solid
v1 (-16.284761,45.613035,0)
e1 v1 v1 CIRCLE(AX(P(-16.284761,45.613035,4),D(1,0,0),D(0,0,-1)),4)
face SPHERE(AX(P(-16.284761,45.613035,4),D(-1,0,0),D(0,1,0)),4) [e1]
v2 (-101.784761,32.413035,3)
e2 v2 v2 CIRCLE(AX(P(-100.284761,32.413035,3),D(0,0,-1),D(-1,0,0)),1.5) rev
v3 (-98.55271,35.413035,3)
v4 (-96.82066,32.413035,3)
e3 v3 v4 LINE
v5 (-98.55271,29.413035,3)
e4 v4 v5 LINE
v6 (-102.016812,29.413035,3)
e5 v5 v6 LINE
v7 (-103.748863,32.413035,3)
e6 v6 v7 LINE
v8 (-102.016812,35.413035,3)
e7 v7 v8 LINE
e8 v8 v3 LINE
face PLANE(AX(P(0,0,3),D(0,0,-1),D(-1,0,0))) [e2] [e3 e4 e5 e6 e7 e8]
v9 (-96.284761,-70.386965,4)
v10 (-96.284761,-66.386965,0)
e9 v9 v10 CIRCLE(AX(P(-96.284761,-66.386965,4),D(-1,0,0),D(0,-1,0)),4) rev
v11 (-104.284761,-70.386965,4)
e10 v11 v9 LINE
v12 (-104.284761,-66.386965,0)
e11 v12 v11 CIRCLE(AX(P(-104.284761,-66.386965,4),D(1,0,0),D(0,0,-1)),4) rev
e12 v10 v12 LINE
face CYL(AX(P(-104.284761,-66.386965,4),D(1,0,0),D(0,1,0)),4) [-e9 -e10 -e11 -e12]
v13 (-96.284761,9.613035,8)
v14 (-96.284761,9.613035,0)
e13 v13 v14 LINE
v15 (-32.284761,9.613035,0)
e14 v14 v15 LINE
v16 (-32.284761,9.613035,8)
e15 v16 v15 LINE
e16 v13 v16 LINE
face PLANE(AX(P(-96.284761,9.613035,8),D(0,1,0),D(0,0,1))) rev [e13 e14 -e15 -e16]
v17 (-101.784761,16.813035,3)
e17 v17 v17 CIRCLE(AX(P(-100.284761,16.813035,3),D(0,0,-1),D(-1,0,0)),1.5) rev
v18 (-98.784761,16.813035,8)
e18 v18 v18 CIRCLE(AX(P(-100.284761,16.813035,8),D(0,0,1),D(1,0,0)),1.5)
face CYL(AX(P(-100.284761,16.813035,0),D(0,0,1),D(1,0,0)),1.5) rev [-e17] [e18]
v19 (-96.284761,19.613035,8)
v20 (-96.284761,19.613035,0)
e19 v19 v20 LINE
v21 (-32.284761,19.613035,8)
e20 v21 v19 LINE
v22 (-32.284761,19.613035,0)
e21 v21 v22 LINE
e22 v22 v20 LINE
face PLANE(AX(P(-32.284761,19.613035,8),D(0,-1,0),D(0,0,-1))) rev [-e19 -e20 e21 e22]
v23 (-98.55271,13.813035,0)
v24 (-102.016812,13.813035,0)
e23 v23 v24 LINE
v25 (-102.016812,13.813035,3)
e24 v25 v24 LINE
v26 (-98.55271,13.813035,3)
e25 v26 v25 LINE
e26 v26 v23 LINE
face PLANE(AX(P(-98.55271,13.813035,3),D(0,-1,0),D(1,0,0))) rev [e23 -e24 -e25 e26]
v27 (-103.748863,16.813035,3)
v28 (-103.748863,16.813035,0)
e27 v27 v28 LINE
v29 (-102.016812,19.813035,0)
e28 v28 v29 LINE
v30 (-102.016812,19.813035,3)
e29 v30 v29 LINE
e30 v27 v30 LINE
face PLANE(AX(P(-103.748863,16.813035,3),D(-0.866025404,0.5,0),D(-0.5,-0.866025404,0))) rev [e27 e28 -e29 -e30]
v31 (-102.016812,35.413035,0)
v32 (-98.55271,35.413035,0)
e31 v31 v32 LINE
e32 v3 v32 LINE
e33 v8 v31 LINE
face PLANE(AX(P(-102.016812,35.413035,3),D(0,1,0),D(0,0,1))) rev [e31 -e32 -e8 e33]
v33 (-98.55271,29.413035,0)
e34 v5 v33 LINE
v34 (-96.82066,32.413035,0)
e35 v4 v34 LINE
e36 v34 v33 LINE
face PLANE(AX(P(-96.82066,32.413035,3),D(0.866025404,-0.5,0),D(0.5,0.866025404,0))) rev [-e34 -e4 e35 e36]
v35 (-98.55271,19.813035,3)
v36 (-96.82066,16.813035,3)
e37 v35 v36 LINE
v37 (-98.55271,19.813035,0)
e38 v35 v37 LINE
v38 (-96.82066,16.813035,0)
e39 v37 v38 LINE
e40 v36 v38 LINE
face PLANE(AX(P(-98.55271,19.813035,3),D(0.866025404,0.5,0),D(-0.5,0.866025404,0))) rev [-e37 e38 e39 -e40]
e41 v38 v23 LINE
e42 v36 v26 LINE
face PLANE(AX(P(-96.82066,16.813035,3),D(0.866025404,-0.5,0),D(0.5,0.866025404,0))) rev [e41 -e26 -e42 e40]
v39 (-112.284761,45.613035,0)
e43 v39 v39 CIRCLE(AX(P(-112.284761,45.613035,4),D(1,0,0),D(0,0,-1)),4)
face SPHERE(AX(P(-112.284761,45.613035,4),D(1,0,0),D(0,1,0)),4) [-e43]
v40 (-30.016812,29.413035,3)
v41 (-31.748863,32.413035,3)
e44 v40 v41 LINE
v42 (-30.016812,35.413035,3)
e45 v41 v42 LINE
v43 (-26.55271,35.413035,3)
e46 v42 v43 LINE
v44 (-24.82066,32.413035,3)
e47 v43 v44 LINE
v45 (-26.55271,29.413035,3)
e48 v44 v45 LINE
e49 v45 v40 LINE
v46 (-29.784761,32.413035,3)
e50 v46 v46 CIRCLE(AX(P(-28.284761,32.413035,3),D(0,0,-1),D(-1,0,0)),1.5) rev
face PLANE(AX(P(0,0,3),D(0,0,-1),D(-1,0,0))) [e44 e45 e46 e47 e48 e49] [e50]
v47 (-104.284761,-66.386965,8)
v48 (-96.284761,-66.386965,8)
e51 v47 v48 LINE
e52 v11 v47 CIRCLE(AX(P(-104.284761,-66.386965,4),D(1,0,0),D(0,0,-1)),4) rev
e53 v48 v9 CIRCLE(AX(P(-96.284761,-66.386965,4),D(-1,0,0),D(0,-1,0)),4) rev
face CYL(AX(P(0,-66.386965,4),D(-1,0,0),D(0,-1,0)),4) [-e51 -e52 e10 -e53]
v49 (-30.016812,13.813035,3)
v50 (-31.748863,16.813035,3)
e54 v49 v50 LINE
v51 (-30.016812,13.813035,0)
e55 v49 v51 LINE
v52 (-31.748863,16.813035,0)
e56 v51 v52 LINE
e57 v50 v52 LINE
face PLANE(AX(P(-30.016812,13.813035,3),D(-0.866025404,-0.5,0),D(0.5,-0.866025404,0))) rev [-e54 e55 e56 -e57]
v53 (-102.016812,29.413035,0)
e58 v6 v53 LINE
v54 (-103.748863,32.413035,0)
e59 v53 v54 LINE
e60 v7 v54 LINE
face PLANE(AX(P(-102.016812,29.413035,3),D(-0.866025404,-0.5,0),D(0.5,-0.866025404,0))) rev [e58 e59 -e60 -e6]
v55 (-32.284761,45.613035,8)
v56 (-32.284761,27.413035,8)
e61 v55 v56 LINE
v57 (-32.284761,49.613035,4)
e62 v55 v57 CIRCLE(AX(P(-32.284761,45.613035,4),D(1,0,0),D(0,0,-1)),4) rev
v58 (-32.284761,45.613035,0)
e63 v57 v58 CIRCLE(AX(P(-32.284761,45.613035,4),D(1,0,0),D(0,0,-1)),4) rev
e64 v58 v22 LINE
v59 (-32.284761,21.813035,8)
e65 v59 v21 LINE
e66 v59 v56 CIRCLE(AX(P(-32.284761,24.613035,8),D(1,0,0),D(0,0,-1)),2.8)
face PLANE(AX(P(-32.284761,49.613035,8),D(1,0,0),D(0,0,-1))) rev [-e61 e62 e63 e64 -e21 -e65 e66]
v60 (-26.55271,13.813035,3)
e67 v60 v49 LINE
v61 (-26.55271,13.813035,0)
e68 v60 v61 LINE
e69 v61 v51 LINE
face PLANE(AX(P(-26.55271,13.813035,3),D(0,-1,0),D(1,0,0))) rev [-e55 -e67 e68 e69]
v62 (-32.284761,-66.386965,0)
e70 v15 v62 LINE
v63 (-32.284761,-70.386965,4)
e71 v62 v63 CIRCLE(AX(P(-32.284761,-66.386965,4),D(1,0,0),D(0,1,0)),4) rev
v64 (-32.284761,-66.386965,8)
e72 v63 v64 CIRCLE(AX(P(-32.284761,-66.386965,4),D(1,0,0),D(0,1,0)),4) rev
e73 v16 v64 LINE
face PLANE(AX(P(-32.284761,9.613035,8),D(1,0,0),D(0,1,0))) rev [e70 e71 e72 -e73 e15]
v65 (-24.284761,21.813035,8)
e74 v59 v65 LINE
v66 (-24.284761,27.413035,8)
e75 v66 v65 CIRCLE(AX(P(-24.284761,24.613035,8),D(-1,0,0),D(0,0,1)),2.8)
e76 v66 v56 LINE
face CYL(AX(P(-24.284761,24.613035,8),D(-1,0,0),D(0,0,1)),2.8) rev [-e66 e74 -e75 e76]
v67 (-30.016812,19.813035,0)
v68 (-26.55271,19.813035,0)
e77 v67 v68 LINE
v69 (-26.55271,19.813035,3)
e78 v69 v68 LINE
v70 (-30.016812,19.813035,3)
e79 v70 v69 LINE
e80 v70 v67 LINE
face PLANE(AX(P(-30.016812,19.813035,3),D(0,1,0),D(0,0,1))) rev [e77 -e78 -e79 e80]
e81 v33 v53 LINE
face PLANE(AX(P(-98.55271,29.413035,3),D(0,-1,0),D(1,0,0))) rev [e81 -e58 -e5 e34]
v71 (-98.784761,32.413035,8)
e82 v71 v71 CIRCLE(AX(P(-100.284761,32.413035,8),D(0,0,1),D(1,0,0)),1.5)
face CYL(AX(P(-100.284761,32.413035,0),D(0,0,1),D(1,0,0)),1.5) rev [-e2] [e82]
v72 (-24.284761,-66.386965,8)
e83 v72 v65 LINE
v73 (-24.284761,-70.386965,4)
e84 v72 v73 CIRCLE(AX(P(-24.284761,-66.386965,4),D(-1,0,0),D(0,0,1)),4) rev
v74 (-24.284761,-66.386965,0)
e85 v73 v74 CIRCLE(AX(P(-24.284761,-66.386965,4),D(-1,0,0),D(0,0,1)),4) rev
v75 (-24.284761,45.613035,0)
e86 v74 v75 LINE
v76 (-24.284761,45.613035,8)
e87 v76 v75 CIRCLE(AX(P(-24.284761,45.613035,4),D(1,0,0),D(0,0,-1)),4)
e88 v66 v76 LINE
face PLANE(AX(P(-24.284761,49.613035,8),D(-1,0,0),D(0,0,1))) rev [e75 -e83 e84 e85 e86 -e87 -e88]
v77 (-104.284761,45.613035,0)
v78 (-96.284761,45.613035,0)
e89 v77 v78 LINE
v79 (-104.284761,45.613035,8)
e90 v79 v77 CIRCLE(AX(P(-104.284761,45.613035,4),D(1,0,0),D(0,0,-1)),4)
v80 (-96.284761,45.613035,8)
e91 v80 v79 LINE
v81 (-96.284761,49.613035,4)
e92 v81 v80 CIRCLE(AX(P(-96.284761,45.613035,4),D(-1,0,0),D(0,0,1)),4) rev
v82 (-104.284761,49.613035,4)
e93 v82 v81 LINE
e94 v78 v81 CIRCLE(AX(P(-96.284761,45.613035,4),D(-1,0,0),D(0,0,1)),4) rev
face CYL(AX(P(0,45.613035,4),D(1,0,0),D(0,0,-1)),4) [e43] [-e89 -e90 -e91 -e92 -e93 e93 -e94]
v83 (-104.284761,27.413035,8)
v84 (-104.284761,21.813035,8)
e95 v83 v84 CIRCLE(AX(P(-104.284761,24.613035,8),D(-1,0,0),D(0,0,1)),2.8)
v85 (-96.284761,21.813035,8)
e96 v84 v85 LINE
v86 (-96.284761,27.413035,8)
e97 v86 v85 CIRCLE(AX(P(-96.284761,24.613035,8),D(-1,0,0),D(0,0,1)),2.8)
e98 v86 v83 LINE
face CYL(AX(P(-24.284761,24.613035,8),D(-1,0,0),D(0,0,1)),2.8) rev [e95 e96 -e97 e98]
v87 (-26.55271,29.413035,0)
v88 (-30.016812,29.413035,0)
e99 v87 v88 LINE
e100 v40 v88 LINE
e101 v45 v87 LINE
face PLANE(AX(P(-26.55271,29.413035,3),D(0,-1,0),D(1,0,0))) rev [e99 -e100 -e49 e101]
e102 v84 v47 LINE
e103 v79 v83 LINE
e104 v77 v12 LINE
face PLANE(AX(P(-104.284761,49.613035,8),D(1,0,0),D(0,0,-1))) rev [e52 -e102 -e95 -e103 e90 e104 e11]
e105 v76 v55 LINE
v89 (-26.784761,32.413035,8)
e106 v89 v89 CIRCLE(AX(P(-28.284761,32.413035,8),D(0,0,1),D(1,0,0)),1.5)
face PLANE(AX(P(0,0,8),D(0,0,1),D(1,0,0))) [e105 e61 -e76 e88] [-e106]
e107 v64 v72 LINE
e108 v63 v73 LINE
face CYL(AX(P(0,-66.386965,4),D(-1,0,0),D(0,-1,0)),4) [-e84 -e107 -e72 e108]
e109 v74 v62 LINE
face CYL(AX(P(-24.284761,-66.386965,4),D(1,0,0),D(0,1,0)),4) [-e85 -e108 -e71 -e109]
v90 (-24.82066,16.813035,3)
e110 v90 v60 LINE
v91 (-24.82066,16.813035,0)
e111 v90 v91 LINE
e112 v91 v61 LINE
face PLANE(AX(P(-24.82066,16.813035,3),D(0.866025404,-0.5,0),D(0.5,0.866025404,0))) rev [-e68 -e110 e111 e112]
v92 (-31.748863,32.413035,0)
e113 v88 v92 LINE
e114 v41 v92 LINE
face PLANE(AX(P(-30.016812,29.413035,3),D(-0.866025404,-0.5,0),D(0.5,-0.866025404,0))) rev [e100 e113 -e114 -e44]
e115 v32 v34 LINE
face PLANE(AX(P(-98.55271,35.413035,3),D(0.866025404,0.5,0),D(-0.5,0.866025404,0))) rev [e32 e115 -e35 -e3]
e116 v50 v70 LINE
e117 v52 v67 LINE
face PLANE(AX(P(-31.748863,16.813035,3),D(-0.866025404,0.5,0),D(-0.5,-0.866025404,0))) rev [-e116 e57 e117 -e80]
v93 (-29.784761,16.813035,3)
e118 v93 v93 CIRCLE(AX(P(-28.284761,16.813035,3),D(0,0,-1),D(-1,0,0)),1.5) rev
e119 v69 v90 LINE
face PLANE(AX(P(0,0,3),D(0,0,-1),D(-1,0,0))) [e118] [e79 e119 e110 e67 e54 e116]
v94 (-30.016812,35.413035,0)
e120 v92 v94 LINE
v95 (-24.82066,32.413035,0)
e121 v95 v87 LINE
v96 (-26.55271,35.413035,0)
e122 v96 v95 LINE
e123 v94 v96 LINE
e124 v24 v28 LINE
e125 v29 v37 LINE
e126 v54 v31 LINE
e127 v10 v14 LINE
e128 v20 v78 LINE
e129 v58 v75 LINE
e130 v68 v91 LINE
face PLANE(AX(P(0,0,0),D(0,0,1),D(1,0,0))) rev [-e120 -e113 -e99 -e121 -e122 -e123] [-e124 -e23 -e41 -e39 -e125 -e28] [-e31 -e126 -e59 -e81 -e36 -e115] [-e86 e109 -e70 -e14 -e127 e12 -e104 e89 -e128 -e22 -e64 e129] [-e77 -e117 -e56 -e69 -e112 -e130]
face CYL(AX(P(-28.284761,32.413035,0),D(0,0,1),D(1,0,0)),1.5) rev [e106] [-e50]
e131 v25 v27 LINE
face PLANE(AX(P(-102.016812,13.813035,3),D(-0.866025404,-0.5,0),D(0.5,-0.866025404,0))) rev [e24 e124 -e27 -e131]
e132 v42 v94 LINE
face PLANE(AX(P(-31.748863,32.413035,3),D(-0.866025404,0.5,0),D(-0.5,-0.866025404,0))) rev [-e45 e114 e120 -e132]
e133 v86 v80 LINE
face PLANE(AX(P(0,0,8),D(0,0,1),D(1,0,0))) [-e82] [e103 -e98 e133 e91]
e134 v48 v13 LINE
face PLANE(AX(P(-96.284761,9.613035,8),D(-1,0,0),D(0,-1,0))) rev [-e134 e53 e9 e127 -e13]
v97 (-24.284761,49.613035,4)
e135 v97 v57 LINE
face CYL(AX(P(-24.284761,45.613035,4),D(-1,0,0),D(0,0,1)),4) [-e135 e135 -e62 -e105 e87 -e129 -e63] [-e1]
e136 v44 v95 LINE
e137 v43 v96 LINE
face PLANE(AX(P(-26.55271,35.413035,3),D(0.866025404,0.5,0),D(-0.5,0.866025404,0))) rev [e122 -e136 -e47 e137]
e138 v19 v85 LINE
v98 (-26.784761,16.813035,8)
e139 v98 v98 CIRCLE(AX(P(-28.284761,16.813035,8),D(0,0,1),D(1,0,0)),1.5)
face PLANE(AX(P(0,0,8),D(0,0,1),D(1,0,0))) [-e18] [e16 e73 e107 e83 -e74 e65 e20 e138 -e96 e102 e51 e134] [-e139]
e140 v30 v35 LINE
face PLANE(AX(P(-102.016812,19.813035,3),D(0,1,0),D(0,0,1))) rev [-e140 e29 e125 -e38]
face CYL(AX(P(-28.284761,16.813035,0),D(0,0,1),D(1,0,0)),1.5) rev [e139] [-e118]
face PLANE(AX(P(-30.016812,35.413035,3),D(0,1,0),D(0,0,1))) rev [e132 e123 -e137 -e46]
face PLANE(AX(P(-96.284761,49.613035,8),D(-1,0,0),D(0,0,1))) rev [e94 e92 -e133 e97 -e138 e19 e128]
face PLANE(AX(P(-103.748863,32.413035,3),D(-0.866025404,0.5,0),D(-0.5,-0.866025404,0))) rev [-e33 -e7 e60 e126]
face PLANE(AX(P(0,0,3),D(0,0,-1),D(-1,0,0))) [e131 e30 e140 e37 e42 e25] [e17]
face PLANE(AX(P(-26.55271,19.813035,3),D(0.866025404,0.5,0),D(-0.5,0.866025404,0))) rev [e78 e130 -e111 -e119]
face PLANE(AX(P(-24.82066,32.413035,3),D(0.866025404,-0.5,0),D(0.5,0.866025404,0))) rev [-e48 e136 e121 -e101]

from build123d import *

# Parameters (mm, degrees)
SALIENTE_EXTRUIR1_DEPTH = 8
REDONDEO1_R             = 4
CROQUIS6_R              = 2.8
CORTAR_EXTRUIR1_DEPTH   = 80.000001
CROQUIS7_R              = 1.5
CORTAR_EXTRUIR2_DEPTH   = 8
CORTAR_EXTRUIR3_DEPTH   = 3


with BuildPart() as part:
    # Croquis1 → Saliente-Extruir1 (new body)
    with BuildSketch(Plane.XY):
        Polygon((-96.284761278, 9.613034623), (-96.284761278, -70.386965377), (-104.284761278, -70.386965377), (-104.284761278, 49.613034623), (-96.284761278, 49.613034623), (-96.284761278, 19.613034623), (-32.284761278, 19.613034623), (-32.284761278, 49.613034623), (-24.284761278, 49.613034623), (-24.284761278, -70.386965377), (-32.284761278, -70.386965377), (-32.284761278, 9.613034623), align=None)
    extrude(amount=SALIENTE_EXTRUIR1_DEPTH)

    # Redondeo1
    redondeo1_edges = [part.edges().sort_by_distance(p)[0] for p in [
        (-100.284761278, -70.386965377, 0),
        (-28.284761278, -70.386965377, 0),
        (-28.284761278, 49.613034623, 8),
        (-28.284761278, 49.613034623, 0),
        (-100.284761278, 49.613034623, 0),
        (-100.284761278, 49.613034623, 8),
        (-28.284761278, -70.386965377, 8),
        (-100.284761278, -70.386965377, 8),
    ]]
    fillet(redondeo1_edges, radius=REDONDEO1_R - 0.0001)  # a hair under: the kernel refuses the full size

    # Croquis4 → Revolución3 (revolve)
    with BuildSketch(Plane.XY.offset(4), mode=Mode.PRIVATE) as revoluci_n3_sk:
        with BuildLine():
            Line((-104.284761278, 49.613034623), (-112.284761278, 49.613034623))
            ThreePointArc((-112.284761278, 49.613034623), (-115.113188403, 48.441461748), (-116.284761278, 45.613034623))
            Line((-116.284761278, 45.613034623), (-104.284761278, 45.613034623))
            Line((-104.284761278, 45.613034623), (-104.284761278, 49.613034623))
        make_face()
    revoluci_n3 = revolve(revoluci_n3_sk.sketch.rotate(Axis((-104.284761278, 45.613034623, 4), (-1, 0, 0)), 90), axis=Axis((-104.284761278, 45.613034623, 4), (-1, 0, 0)))

    # Simetría1: Revolución3 across plane
    add(revoluci_n3.mirror(Plane.ZY.offset(64.284761278)))

    # Croquis6 → Cortar-Extruir1 (cut)
    with BuildSketch(Plane.ZY.offset(104.284761278)):
        with Locations((8, 24.613034623)):
            Circle(CROQUIS6_R)
    extrude(amount=-CORTAR_EXTRUIR1_DEPTH, mode=Mode.SUBTRACT)

    # Croquis7 → Cortar-Extruir2 (cut)
    with BuildSketch(Plane.XY.offset(8)):
        with Locations((-100.284761278, 16.813034623)):
            Circle(CROQUIS7_R)
        with Locations((-28.284761278, 16.813034623)):
            Circle(CROQUIS7_R)
        with Locations((-28.284761278, 32.413034623)):
            Circle(CROQUIS7_R)
        with Locations((-100.284761278, 32.413034623)):
            Circle(CROQUIS7_R)
    extrude(amount=-CORTAR_EXTRUIR2_DEPTH, mode=Mode.SUBTRACT)

    # Croquis8 → Cortar-Extruir3 (cut)
    with BuildSketch(Plane(origin=(0, 0, 0), x_dir=(-1, 0, 0), z_dir=(0, 0, -1))):
        Polygon((103.748862893, 16.813034623), (102.016812085, 19.813034623), (98.55271047, 19.813034623), (96.820659663, 16.813034623), (98.55271047, 13.813034623), (102.016812085, 13.813034623), align=None)
        Polygon((31.748862893, 16.813034623), (30.016812085, 19.813034623), (26.55271047, 19.813034623), (24.820659663, 16.813034623), (26.55271047, 13.813034623), (30.016812085, 13.813034623), align=None)
        Polygon((103.748862893, 32.413034623), (102.016812085, 35.413034623), (98.55271047, 35.413034623), (96.820659663, 32.413034623), (98.55271047, 29.413034623), (102.016812085, 29.413034623), align=None)
        Polygon((31.748862893, 32.413034623), (30.016812085, 35.413034623), (26.55271047, 35.413034623), (24.820659663, 32.413034623), (26.55271047, 29.413034623), (30.016812085, 29.413034623), align=None)
    extrude(amount=-CORTAR_EXTRUIR3_DEPTH, mode=Mode.SUBTRACT)


solid = part.part
